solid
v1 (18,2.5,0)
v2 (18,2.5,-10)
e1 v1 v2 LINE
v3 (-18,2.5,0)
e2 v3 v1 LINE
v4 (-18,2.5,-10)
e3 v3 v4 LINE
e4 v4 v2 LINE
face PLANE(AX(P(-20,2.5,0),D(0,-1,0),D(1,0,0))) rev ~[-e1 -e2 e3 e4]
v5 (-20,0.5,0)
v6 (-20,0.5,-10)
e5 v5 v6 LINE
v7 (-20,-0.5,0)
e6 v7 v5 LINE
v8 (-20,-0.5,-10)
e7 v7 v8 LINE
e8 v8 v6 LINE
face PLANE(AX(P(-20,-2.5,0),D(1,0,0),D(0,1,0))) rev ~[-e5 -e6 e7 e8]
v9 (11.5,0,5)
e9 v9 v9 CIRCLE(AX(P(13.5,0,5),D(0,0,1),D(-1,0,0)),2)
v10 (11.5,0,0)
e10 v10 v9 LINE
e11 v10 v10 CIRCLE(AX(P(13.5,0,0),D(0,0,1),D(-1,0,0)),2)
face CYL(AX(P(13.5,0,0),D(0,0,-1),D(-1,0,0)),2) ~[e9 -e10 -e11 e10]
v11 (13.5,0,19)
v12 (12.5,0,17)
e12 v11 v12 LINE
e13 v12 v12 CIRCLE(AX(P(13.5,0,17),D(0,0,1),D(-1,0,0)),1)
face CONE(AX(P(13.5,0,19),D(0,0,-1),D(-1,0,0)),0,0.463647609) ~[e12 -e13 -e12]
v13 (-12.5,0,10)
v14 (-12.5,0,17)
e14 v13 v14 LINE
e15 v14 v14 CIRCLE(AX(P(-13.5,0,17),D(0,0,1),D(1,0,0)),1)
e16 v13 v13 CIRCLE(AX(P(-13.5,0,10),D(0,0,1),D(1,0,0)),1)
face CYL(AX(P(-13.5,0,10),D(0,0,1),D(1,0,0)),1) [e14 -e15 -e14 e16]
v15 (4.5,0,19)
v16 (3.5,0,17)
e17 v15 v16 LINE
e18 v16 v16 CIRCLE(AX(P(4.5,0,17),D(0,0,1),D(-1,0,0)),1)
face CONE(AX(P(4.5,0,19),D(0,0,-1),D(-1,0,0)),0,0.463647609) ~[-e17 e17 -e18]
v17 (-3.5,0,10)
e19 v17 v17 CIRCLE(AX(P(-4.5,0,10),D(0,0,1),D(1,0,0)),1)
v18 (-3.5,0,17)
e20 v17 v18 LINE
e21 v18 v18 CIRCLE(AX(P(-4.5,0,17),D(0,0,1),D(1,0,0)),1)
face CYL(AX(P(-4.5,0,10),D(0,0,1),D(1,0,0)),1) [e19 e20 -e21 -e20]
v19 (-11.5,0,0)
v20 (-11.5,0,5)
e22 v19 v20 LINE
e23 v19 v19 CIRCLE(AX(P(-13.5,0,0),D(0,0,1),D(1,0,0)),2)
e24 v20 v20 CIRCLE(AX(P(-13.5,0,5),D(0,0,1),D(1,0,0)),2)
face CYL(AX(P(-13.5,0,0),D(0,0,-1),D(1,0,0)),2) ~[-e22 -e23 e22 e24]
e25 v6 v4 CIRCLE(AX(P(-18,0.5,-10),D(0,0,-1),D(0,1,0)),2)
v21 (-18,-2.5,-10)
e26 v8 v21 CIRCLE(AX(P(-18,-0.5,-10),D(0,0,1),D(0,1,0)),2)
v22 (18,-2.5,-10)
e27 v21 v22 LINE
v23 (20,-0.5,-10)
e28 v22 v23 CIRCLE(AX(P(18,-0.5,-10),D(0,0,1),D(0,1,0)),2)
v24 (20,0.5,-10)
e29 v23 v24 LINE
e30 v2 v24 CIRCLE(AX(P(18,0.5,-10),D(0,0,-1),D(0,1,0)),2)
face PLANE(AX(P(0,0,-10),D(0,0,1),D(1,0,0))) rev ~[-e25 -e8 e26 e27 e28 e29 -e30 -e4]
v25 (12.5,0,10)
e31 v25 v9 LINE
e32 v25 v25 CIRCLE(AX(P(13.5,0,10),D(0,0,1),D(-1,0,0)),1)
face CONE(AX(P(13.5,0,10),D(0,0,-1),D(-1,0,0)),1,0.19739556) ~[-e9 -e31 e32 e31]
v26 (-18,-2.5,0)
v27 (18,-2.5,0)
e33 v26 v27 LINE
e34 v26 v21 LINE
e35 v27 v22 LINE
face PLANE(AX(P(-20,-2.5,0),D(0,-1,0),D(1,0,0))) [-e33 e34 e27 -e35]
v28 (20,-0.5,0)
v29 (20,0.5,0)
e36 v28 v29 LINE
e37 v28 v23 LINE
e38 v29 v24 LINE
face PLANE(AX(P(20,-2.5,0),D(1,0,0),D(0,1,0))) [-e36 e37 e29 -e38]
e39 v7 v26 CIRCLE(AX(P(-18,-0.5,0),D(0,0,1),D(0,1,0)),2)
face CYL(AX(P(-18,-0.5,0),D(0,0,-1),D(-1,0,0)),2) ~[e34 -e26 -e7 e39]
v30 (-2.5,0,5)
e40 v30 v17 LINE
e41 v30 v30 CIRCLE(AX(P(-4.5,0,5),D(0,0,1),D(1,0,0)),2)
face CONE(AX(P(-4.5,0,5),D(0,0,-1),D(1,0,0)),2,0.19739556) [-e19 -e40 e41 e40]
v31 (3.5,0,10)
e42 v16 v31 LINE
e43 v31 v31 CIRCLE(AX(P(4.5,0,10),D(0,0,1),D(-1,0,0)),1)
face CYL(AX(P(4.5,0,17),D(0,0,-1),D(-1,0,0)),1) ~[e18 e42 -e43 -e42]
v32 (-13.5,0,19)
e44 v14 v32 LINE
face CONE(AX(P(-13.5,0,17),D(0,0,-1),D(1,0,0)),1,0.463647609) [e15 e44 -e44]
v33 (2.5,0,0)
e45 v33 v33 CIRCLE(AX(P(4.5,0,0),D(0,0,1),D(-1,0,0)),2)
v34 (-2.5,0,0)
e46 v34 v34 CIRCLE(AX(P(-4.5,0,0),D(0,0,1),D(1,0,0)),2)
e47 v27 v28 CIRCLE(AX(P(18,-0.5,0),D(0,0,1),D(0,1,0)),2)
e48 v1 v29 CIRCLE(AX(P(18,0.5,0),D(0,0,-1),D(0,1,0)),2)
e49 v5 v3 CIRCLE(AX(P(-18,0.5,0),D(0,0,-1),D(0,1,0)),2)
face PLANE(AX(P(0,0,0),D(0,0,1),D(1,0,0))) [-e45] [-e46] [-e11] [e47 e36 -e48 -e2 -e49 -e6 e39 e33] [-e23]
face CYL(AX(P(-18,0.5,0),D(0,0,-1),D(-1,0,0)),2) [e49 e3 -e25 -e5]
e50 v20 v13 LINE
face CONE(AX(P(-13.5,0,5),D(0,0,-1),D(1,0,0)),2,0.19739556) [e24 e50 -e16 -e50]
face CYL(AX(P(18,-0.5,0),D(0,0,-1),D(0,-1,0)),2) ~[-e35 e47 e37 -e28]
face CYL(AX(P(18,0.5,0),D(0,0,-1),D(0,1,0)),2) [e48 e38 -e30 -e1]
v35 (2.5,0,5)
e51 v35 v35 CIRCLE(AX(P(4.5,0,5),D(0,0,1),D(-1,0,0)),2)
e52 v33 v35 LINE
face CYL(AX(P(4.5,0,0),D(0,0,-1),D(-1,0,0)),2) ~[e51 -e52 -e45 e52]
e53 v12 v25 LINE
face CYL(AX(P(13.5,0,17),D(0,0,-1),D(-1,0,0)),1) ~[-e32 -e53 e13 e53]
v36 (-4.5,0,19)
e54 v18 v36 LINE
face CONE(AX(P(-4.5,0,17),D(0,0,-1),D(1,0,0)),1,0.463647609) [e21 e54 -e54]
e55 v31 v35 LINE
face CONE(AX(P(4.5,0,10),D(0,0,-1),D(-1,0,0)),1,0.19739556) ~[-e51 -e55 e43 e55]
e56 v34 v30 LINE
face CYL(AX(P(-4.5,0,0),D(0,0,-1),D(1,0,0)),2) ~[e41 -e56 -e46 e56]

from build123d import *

# Parameters (mm, degrees)
F0_W     = 40
F0_H     = 5
F0_R     = 2
F0_R_2   = 1
F1_DEPTH = 10
F3_DEPTH = 5
F8_R     = 2


# Not quite as in the source:
# - a feature names something its author has since deleted; it is built from what else it names


with BuildPart() as f1:
    # F0 (on Top) → F1 (new body)
    with BuildSketch(Plane.XY):
        Rectangle(F0_W, F0_H)
        with Locations((-13.5, 0)):
            Circle(F0_R, mode=Mode.SUBTRACT)
        with BuildLine():
            ThreePointArc((-6.5, 0), (-4.5, 2), (-2.5, 0))
            ThreePointArc((-2.5, 0), (-4.5, -2), (-6.5, 0))
        make_face(mode=Mode.SUBTRACT)
        with BuildLine():
            ThreePointArc((6.5, 0), (4.5, -2), (2.5, 0))
            ThreePointArc((2.5, 0), (4.5, 2), (6.5, 0))
        make_face(mode=Mode.SUBTRACT)
        with BuildLine():
            ThreePointArc((15.5, 0), (13.5, -2), (11.5, 0))
            ThreePointArc((11.5, 0), (13.5, 2), (15.5, 0))
        make_face(mode=Mode.SUBTRACT)
        with BuildLine():
            ThreePointArc((15.5, 0), (13.5, 2), (11.5, 0))
            ThreePointArc((11.5, 0), (13.5, -2), (15.5, 0))
        make_face()
        with BuildLine():
            ThreePointArc((14.5, 0), (13.5, -1), (12.5, 0))
            ThreePointArc((12.5, 0), (13.5, 1), (14.5, 0))
        make_face(mode=Mode.SUBTRACT)
        with Locations((-13.5, 0)):
            Circle(F0_R)
        with Locations((-13.5, 0)):
            Circle(F0_R_2, mode=Mode.SUBTRACT)
        with BuildLine():
            ThreePointArc((14.5, 0), (13.5, 1), (12.5, 0))
            ThreePointArc((12.5, 0), (13.5, -1), (14.5, 0))
        make_face()
        with BuildLine():
            Line((4.5, 0), (3.5, 0))
            ThreePointArc((3.5, 0), (4.5, -1), (5.5, 0))
            Line((5.5, 0), (4.5, 0))
        make_face()
        with BuildLine():
            ThreePointArc((-5.5, 0), (-4.5, -1), (-3.5, 0))
            Line((-3.5, 0), (-4.5, 0))
            Line((-4.5, 0), (-5.5, 0))
        make_face()
        with Locations((-13.5, 0)):
            Circle(F0_R_2)
        with BuildLine():
            Line((-4.5, 0), (-3.5, 0))
            ThreePointArc((-3.5, 0), (-4.5, 1), (-5.5, 0))
            Line((-5.5, 0), (-4.5, 0))
        make_face()
        with BuildLine():
            ThreePointArc((5.5, 0), (4.5, 1), (3.5, 0))
            Line((3.5, 0), (4.5, 0))
            Line((4.5, 0), (5.5, 0))
        make_face()
        with BuildLine():
            ThreePointArc((-6.5, 0), (-4.5, -2), (-2.5, 0))
            Line((-2.5, 0), (-3.5, 0))
            ThreePointArc((-3.5, 0), (-4.5, -1), (-5.5, 0))
            Line((-5.5, 0), (-6.5, 0))
        make_face()
        with BuildLine():
            Line((3.5, 0), (2.5, 0))
            ThreePointArc((2.5, 0), (4.5, -2), (6.5, 0))
            Line((6.5, 0), (5.5, 0))
            ThreePointArc((5.5, 0), (4.5, -1), (3.5, 0))
        make_face()
        with BuildLine():
            ThreePointArc((6.5, 0), (4.5, 2), (2.5, 0))
            Line((2.5, 0), (3.5, 0))
            ThreePointArc((3.5, 0), (4.5, 1), (5.5, 0))
            Line((5.5, 0), (6.5, 0))
        make_face()
        with BuildLine():
            Line((-3.5, 0), (-2.5, 0))
            ThreePointArc((-2.5, 0), (-4.5, 2), (-6.5, 0))
            Line((-6.5, 0), (-5.5, 0))
            ThreePointArc((-5.5, 0), (-4.5, 1), (-3.5, 0))
        make_face()
    extrude(amount=-F1_DEPTH)

    # F0 (on Top) → F3 (join)
    with BuildSketch(Plane.XY):
        with Locations((-13.5, 0)):
            Circle(F0_R)
        with Locations((-13.5, 0)):
            Circle(F0_R_2, mode=Mode.SUBTRACT)
        with BuildLine():
            ThreePointArc((15.5, 0), (13.5, 2), (11.5, 0))
            ThreePointArc((11.5, 0), (13.5, -2), (15.5, 0))
        make_face()
        with BuildLine():
            ThreePointArc((14.5, 0), (13.5, -1), (12.5, 0))
            ThreePointArc((12.5, 0), (13.5, 1), (14.5, 0))
        make_face(mode=Mode.SUBTRACT)
        with BuildLine():
            Line((4.5, 0), (3.5, 0))
            ThreePointArc((3.5, 0), (4.5, -1), (5.5, 0))
            Line((5.5, 0), (4.5, 0))
        make_face()
        with BuildLine():
            ThreePointArc((14.5, 0), (13.5, 1), (12.5, 0))
            ThreePointArc((12.5, 0), (13.5, -1), (14.5, 0))
        make_face()
        with BuildLine():
            ThreePointArc((5.5, 0), (4.5, 1), (3.5, 0))
            Line((3.5, 0), (4.5, 0))
            Line((4.5, 0), (5.5, 0))
        make_face()
        with BuildLine():
            ThreePointArc((-5.5, 0), (-4.5, -1), (-3.5, 0))
            Line((-3.5, 0), (-4.5, 0))
            Line((-4.5, 0), (-5.5, 0))
        make_face()
        with BuildLine():
            Line((-4.5, 0), (-3.5, 0))
            ThreePointArc((-3.5, 0), (-4.5, 1), (-5.5, 0))
            Line((-5.5, 0), (-4.5, 0))
        make_face()
        with Locations((-13.5, 0)):
            Circle(F0_R_2)
        with BuildLine():
            ThreePointArc((-6.5, 0), (-4.5, -2), (-2.5, 0))
            Line((-2.5, 0), (-3.5, 0))
            ThreePointArc((-3.5, 0), (-4.5, -1), (-5.5, 0))
            Line((-5.5, 0), (-6.5, 0))
        make_face()
        with BuildLine():
            Line((-3.5, 0), (-2.5, 0))
            ThreePointArc((-2.5, 0), (-4.5, 2), (-6.5, 0))
            Line((-6.5, 0), (-5.5, 0))
            ThreePointArc((-5.5, 0), (-4.5, 1), (-3.5, 0))
        make_face()
        with BuildLine():
            ThreePointArc((6.5, 0), (4.5, 2), (2.5, 0))
            Line((2.5, 0), (3.5, 0))
            ThreePointArc((3.5, 0), (4.5, 1), (5.5, 0))
            Line((5.5, 0), (6.5, 0))
        make_face()
        with BuildLine():
            Line((3.5, 0), (2.5, 0))
            ThreePointArc((2.5, 0), (4.5, -2), (6.5, 0))
            Line((6.5, 0), (5.5, 0))
            ThreePointArc((5.5, 0), (4.5, -1), (3.5, 0))
        make_face()
    extrude(amount=F3_DEPTH)

    # F2 (on Front) → F4 (revolve)
    with BuildSketch(Plane.XZ):
        Polygon((-13.5, 19), (-13.5, 10), (-12.5, 10), (-12.5, 17), align=None)
        Polygon((-13.5, 10), (-13.5, 5), (-11.5, 5), (-12.5, 10), align=None)
    revolve(axis=Axis((-13.5, 0, 14.5), (0, 0, 1)))

    # F2 (on Front) → F5 (revolve)
    with BuildSketch(Plane.XZ):
        Polygon((-4.5, 19), (-4.5, 10), (-3.5, 10), (-3.5, 17), align=None)
        Polygon((-4.5, 10), (-4.5, 5), (-2.5, 5), (-3.5, 10), align=None)
    revolve(axis=Axis((-4.5, 0, 14.5), (0, 0, 1)))

    # F2 (on Front) → F6 (revolve)
    with BuildSketch(Plane.XZ):
        Polygon((2.5, 5), (4.5, 5), (4.5, 10), (3.5, 10), align=None)
        Polygon((3.5, 10), (4.5, 10), (4.5, 19), (3.5, 17), align=None)
    revolve(axis=Axis((4.5, 0, 14.5), (0, 0, 1)))

    # F2 (on Front) → F7 (revolve)
    with BuildSketch(Plane.XZ):
        Polygon((13.5, 5), (13.5, 10), (13.5, 19), (12.5, 17), (12.5, 10), (11.5, 5), align=None)
    revolve(axis=Axis((13.5, 0, 14.5), (0, 0, 1)))

    # F8
    f8_edges = [f1.edges().sort_by_distance(p)[0] for p in [
        (-20, -2.5, -5),
        (-20, 2.5, -5),
        (20, -2.5, -5),
        (20, 2.5, -5),
    ]]
    fillet(f8_edges, radius=F8_R)


solid = f1.part
